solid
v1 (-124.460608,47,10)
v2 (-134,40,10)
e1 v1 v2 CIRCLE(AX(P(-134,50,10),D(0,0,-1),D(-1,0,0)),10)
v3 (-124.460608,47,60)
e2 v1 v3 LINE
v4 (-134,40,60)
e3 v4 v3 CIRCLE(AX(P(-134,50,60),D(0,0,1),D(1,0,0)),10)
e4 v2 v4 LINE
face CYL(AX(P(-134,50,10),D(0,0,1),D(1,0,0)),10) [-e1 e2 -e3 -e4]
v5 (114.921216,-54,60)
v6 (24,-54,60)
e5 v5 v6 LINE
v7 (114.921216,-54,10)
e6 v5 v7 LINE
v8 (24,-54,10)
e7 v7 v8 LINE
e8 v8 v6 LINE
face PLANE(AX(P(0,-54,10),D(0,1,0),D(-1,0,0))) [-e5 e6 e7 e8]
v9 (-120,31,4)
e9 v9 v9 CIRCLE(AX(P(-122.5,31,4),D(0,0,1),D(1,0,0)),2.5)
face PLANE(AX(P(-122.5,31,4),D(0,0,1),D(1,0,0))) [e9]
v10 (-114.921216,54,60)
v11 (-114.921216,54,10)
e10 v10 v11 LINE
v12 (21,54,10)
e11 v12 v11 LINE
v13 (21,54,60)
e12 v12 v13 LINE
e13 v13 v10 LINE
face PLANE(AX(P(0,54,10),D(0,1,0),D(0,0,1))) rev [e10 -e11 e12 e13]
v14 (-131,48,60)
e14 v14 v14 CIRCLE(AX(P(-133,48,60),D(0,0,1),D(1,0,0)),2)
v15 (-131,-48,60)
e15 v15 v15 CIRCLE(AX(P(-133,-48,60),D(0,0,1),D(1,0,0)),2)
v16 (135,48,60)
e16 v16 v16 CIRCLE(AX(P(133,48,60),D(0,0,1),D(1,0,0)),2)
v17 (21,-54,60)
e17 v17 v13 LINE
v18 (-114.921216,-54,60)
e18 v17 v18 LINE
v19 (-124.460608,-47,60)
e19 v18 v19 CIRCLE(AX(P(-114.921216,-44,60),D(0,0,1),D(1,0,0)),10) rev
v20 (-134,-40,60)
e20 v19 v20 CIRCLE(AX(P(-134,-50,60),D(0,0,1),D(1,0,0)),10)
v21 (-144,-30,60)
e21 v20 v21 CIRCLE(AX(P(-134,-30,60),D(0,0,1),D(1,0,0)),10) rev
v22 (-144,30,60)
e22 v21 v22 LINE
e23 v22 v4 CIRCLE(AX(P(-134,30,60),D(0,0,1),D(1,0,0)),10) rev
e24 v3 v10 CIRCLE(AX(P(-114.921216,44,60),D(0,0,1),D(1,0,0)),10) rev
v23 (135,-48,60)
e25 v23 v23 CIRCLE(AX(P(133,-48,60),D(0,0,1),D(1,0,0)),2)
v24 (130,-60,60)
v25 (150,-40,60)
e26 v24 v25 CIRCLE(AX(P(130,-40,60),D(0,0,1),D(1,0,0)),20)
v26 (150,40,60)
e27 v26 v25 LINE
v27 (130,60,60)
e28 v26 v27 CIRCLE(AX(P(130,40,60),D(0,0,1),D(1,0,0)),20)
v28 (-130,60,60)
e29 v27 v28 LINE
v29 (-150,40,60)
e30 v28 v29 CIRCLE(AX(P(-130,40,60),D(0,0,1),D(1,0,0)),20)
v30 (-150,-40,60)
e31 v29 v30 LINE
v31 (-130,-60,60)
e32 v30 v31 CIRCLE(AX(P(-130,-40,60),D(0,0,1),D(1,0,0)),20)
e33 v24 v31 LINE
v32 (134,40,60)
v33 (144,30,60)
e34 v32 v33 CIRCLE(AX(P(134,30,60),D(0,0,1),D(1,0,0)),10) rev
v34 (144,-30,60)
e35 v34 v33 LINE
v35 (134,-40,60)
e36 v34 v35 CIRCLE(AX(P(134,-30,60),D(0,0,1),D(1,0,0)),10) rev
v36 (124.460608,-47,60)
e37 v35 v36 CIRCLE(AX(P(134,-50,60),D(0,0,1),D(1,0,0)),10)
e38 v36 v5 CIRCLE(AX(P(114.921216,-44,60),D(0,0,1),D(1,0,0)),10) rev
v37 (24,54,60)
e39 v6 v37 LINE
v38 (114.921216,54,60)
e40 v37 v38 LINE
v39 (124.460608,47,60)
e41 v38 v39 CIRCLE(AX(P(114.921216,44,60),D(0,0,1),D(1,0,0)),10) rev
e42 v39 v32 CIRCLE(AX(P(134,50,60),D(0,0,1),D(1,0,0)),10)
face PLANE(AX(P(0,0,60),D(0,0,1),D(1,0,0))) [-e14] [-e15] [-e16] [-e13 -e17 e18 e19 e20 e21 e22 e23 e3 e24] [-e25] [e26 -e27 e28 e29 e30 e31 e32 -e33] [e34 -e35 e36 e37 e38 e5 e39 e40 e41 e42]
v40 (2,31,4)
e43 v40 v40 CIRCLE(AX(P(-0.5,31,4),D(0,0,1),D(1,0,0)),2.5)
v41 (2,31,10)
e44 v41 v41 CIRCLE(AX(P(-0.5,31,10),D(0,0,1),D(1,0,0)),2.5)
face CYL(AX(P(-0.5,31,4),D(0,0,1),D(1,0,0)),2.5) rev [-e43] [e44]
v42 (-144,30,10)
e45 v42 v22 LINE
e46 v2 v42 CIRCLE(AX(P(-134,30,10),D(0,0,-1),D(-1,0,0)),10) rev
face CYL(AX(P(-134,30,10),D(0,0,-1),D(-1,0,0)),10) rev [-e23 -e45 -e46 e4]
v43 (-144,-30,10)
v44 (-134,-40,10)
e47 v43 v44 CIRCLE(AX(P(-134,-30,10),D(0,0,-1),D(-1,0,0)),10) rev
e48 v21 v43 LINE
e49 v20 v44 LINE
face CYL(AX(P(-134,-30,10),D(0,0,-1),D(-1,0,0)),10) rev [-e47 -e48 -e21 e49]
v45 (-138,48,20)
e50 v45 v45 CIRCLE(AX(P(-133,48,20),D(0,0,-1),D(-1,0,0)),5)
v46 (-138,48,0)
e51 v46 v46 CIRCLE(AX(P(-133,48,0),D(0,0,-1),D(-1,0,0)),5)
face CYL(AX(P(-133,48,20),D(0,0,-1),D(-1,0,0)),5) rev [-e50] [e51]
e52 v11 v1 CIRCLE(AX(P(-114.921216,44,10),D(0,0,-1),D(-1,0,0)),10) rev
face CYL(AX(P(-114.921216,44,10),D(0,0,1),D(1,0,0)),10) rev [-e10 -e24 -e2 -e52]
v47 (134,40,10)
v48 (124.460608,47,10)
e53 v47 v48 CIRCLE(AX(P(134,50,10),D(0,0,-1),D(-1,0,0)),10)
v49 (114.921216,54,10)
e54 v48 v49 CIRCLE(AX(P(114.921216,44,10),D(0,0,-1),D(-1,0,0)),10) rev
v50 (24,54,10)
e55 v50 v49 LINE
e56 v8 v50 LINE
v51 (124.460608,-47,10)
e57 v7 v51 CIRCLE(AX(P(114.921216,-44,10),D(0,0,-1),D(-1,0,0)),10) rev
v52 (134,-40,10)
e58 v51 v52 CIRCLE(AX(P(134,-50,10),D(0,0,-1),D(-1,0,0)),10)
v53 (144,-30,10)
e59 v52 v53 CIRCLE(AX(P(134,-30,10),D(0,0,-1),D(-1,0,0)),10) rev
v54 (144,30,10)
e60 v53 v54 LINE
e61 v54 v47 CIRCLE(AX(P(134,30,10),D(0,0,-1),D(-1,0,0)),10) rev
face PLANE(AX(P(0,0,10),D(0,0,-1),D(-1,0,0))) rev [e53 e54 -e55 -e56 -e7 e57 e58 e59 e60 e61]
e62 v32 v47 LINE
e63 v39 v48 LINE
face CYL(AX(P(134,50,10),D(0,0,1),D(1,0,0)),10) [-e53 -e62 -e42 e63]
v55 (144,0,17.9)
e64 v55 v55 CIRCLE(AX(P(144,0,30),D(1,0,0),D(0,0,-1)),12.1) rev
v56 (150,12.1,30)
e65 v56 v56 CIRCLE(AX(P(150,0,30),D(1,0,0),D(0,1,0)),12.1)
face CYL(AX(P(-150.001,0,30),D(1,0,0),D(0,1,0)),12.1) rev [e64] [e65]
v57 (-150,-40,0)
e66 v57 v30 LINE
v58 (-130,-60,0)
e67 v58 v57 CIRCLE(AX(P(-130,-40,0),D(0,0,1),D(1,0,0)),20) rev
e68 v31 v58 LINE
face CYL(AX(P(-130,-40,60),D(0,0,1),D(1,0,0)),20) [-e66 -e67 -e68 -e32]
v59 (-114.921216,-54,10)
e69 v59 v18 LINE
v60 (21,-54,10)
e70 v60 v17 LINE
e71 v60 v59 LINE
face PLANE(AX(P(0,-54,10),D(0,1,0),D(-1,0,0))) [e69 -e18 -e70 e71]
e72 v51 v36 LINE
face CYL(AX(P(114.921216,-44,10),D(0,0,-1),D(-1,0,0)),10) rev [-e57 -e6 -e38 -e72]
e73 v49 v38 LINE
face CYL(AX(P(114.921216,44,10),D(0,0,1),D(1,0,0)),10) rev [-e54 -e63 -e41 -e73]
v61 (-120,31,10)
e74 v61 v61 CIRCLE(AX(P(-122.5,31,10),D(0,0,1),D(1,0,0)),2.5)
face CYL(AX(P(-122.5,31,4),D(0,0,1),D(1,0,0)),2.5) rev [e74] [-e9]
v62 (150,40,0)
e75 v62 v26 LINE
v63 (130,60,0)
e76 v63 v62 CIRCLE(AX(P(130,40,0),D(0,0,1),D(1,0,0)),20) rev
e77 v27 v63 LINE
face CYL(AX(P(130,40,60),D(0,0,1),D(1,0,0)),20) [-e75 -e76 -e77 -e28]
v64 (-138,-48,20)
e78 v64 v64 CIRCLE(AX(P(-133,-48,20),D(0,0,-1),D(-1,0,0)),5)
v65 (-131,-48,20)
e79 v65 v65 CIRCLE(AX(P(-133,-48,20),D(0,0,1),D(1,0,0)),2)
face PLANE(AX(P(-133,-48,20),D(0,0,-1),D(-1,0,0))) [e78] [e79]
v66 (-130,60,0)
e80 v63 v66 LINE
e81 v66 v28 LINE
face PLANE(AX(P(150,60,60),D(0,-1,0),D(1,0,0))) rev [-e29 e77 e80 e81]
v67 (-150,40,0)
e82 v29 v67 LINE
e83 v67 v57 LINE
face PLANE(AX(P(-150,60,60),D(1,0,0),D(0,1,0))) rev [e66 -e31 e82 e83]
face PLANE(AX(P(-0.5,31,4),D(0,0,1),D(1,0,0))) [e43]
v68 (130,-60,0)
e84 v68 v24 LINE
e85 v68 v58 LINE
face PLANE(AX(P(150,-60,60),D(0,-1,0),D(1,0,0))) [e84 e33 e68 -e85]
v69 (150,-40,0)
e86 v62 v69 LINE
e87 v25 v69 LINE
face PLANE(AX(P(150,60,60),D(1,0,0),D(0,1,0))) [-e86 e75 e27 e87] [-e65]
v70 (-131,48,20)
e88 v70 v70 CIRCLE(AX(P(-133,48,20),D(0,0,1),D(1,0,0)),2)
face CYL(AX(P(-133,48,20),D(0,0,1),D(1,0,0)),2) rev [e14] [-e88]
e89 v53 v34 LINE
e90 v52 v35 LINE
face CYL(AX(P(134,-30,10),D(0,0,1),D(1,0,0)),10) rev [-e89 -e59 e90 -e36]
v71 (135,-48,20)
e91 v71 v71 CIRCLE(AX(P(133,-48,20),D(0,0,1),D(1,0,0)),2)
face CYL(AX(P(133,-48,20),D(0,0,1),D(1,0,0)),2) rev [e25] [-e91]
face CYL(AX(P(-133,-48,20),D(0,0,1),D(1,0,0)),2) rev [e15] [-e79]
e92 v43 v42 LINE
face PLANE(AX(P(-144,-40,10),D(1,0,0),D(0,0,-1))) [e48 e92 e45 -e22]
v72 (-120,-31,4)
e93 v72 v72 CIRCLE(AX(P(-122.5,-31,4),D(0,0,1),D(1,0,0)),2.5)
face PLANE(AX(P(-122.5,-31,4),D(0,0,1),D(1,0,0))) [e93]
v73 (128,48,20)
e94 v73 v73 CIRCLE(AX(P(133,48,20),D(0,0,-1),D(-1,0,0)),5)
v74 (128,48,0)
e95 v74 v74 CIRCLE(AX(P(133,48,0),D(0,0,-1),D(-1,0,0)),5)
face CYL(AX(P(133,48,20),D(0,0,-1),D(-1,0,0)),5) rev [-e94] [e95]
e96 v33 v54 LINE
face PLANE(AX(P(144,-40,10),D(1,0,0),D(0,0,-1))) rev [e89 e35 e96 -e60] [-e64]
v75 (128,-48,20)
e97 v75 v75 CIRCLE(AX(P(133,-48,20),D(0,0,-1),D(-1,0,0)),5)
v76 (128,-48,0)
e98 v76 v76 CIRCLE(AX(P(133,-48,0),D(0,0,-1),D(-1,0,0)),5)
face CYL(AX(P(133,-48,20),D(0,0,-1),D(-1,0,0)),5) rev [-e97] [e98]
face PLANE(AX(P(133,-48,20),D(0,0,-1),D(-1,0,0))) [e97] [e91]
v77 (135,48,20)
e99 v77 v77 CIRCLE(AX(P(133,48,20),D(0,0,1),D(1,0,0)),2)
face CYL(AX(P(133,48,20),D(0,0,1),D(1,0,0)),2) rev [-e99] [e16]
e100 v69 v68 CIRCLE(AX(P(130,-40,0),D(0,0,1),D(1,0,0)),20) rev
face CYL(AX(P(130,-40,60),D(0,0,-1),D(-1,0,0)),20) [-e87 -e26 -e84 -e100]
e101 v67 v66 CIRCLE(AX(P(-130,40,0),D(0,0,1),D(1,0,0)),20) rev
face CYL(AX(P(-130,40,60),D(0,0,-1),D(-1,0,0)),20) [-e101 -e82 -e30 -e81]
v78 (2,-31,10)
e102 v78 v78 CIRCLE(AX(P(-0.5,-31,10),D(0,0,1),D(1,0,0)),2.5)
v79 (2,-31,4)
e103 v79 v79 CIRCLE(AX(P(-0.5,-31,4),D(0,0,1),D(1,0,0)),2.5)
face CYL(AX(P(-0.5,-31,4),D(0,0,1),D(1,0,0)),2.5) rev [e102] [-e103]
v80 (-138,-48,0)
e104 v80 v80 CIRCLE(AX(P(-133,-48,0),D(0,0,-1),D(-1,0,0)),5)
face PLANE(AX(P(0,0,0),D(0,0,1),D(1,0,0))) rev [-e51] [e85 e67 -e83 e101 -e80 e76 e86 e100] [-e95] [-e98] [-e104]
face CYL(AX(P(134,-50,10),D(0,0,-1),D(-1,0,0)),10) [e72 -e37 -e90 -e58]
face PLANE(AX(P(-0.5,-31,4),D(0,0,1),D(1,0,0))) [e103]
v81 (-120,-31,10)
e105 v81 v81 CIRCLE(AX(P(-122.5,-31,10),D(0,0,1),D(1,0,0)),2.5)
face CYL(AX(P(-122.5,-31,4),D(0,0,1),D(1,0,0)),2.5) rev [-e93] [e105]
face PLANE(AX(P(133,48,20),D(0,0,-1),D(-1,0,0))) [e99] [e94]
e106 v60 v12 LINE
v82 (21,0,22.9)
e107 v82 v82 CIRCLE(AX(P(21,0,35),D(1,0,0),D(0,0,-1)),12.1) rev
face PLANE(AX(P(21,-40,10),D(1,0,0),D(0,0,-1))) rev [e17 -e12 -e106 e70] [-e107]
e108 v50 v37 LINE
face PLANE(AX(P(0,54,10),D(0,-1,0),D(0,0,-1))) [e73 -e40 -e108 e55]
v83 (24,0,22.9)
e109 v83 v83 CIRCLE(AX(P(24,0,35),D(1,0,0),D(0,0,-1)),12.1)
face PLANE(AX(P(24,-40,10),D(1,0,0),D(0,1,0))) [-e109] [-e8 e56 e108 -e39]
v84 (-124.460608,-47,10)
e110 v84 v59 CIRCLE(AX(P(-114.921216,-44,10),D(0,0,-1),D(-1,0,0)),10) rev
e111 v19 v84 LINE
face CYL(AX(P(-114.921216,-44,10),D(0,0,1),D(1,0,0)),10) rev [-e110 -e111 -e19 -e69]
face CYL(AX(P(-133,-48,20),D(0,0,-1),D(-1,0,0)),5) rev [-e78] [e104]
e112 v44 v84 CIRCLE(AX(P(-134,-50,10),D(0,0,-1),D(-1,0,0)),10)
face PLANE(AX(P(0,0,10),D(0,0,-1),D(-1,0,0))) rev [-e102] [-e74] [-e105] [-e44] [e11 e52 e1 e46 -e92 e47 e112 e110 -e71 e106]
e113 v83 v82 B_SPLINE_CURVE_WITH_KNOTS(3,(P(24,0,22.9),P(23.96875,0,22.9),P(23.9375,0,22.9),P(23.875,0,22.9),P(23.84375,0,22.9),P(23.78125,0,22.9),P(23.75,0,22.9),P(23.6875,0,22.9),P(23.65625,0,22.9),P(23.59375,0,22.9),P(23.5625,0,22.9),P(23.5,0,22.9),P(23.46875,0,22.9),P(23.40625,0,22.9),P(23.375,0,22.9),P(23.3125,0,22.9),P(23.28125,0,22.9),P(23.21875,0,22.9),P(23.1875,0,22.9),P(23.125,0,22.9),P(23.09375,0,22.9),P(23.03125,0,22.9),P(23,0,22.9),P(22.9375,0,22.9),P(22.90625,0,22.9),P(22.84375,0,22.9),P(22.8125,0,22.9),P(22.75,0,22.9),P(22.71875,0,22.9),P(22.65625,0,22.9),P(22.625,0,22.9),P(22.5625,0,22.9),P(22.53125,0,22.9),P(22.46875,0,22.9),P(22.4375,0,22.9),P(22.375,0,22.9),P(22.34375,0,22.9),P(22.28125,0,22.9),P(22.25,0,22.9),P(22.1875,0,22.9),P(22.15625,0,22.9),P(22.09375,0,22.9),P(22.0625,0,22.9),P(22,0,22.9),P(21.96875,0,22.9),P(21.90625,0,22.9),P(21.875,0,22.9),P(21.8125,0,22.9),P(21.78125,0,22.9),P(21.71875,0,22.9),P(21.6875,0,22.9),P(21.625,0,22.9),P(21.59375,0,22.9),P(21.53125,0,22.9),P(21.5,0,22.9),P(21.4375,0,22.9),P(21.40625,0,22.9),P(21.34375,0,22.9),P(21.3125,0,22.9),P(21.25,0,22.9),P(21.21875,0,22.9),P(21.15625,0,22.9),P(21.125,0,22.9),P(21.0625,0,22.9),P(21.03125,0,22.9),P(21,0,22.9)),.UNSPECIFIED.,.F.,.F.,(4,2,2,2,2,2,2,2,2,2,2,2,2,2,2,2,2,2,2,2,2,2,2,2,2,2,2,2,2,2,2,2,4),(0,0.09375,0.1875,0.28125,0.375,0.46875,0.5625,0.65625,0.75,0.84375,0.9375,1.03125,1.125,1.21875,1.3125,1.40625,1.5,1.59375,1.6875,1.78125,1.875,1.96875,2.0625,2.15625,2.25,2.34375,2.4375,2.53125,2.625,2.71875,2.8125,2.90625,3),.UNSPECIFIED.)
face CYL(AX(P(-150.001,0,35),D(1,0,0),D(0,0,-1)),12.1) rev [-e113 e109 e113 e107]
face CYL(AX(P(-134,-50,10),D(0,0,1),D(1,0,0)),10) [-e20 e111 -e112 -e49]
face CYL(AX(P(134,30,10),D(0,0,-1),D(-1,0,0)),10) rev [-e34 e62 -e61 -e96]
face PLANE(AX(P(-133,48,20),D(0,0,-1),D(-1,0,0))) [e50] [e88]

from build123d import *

# Parameters (mm, degrees)
SKETCH_1_W           = 300
SKETCH_1_H           = 120
EXTRUDE_2_DEPTH      = 60
SKETCH_2_W           = 120
SKETCH_2_H           = 80
SKETCH_2_W_2         = 165
CUT_EXTRUDE_1_DEPTH  = 50
FILLET_5_R           = 20
SKETCH_2_5_R         = 2
CUT_EXTRUDE_5_DEPTH  = 40
CUT_EXTRUDE_4_REACH  = 313.769
SKETCH_10_R          = 12.1
SKETCH_13_R          = 5
CUT_EXTRUDE_7_DEPTH  = 20
CUT_EXTRUDE_8_REACH  = 195.587
SKETCH_16_R          = 2.5
CUT_EXTRUDE_9_DEPTH  = 6
SKETCH_2_7_W         = 100
SKETCH_2_7_H         = 14
SKETCH_2_7_W_2       = 145
CUT_EXTRUDE_10_DEPTH = 50
FILLET_6_R           = 10
FILLET_7_R           = 10
FILLET_8_R           = 10
FILLET_9_R           = 10
FILLET_10_R          = 10
FILLET_11_R          = 10
FILLET_12_R          = 10
FILLET_14_R          = 10
FILLET_15_R          = 10
FILLET_16_R          = 10


with BuildPart() as part:
    # Эскиз1 → Бобышка-Вытянуть2 (new body)
    with BuildSketch(Plane.XY):
        Rectangle(SKETCH_1_W, SKETCH_1_H)
    extrude(amount=EXTRUDE_2_DEPTH)

    # Эскиз2 → Вырез-Вытянуть1 (cut)
    with BuildSketch(Plane.XY.offset(60)):
        with Locations((84, 0)):
            Rectangle(SKETCH_2_W, SKETCH_2_H)
        with Locations((-61.5, 0)):
            Rectangle(SKETCH_2_W_2, SKETCH_2_H)
    extrude(amount=-CUT_EXTRUDE_1_DEPTH, mode=Mode.SUBTRACT)

    # Скругление5
    fillet_5_edges = [part.edges().sort_by_distance(p)[0] for p in [
        (150, -60, 30),
        (150, 60, 30),
        (-150, 60, 30),
        (-150, -60, 30),
    ]]
    fillet(fillet_5_edges, radius=FILLET_5_R)

    # Эскиз2<5> → Вырез-Вытянуть5 (cut)
    with BuildSketch(Plane.XY.offset(60)):
        with Locations((133, 48)):
            Circle(SKETCH_2_5_R)
        with Locations((133, -48)):
            Circle(SKETCH_2_5_R)
        with Locations((-133, 48)):
            Circle(SKETCH_2_5_R)
        with Locations((-133, -48)):
            Circle(SKETCH_2_5_R)
    extrude(amount=-CUT_EXTRUDE_5_DEPTH, mode=Mode.SUBTRACT)

    # Эскиз10 → Вырез-Вытянуть4 (cut, up to next)
    with BuildSketch(Plane(origin=(150, 0, 0), x_dir=(0, 0, -1), z_dir=(1, 0, 0)), mode=Mode.PRIVATE) as cut_extrude_4_sk1:
        with Locations(Location((-30, 0, 0), (0, 0, 90))):
            Circle(SKETCH_10_R)
    cut_extrude_4_tool1 = extrude(cut_extrude_4_sk1.sketch, amount=-CUT_EXTRUDE_4_REACH, mode=Mode.PRIVATE) & part.part
    add(cut_extrude_4_tool1.solids().sort_by_distance((150, 0, 30))[0], mode=Mode.SUBTRACT)

    # Эскиз13 → Вырез-Вытянуть7 (cut)
    with BuildSketch(Plane(origin=(0, 0, 0), x_dir=(-1, 0, 0), z_dir=(0, 0, -1))):
        with Locations((-133, 48)):
            Circle(SKETCH_13_R)
        with Locations((-133, -48)):
            Circle(SKETCH_13_R)
        with Locations((133, -48)):
            Circle(SKETCH_13_R)
        with Locations((133, 48)):
            Circle(SKETCH_13_R)
    extrude(amount=-CUT_EXTRUDE_7_DEPTH, mode=Mode.SUBTRACT)

    # Эскиз14 → Вырез-Вытянуть8 (cut, up to next)
    with BuildSketch(Plane(origin=(24, 0, 0), x_dir=(0, 0, -1), z_dir=(1, 0, 0)), mode=Mode.PRIVATE) as cut_extrude_8_sk1:
        with BuildLine():
            ThreePointArc((-28.587012826, 10.260779478), (-35, 12.1), (-41.412987174, 10.260779478))
            Line((-41.412987174, 10.260779478), (-35, 0))
            Line((-35, 0), (-28.587012826, 10.260779478))
        make_face()
    cut_extrude_8_tool1 = extrude(cut_extrude_8_sk1.sketch, amount=-CUT_EXTRUDE_8_REACH, mode=Mode.PRIVATE) & part.part
    # Эскиз14 → Вырез-Вытянуть8 (cut, up to next)
    with BuildSketch(Plane(origin=(24, 0, 0), x_dir=(0, 0, -1), z_dir=(1, 0, 0)), mode=Mode.PRIVATE) as cut_extrude_8_sk2:
        with BuildLine():
            Line((-35, 0), (-41.412987174, 10.260779478))
            ThreePointArc((-41.412987174, 10.260779478), (-47.1, 0), (-41.412987174, -10.260779478))
            Line((-41.412987174, -10.260779478), (-35, 0))
        make_face()
    cut_extrude_8_tool2 = extrude(cut_extrude_8_sk2.sketch, amount=-CUT_EXTRUDE_8_REACH, mode=Mode.PRIVATE) & part.part
    # Эскиз14 → Вырез-Вытянуть8 (cut, up to next)
    with BuildSketch(Plane(origin=(24, 0, 0), x_dir=(0, 0, -1), z_dir=(1, 0, 0)), mode=Mode.PRIVATE) as cut_extrude_8_sk3:
        with BuildLine():
            Line((-28.587012826, 10.260779478), (-35, 0))
            Line((-35, 0), (-28.587012826, -10.260779478))
            ThreePointArc((-28.587012826, -10.260779478), (-24.416825977, -5.865699242), (-22.9, 0))
            ThreePointArc((-22.9, 0), (-24.416825977, 5.865699242), (-28.587012826, 10.260779478))
        make_face()
    cut_extrude_8_tool3 = extrude(cut_extrude_8_sk3.sketch, amount=-CUT_EXTRUDE_8_REACH, mode=Mode.PRIVATE) & part.part
    # Эскиз14 → Вырез-Вытянуть8 (cut, up to next)
    with BuildSketch(Plane(origin=(24, 0, 0), x_dir=(0, 0, -1), z_dir=(1, 0, 0)), mode=Mode.PRIVATE) as cut_extrude_8_sk4:
        with BuildLine():
            Line((-28.587012826, -10.260779478), (-35, 0))
            Line((-35, 0), (-41.412987174, -10.260779478))
            ThreePointArc((-41.412987174, -10.260779478), (-35, -12.1), (-28.587012826, -10.260779478))
        make_face()
    cut_extrude_8_tool4 = extrude(cut_extrude_8_sk4.sketch, amount=-CUT_EXTRUDE_8_REACH, mode=Mode.PRIVATE) & part.part
    # Эскиз14 → Вырез-Вытянуть8 (cut, up to next)
    with BuildSketch(Plane(origin=(24, 0, 0), x_dir=(0, 0, -1), z_dir=(1, 0, 0)), mode=Mode.PRIVATE) as cut_extrude_8_sk5:
        with BuildLine():
            ThreePointArc((-28.587012826, 10.260779478), (-35, 12.1), (-41.412987174, 10.260779478))
            Line((-41.412987174, 10.260779478), (-35, 0))
            Line((-35, 0), (-28.587012826, 10.260779478))
        make_face()
    cut_extrude_8_tool5 = extrude(cut_extrude_8_sk5.sketch, amount=-CUT_EXTRUDE_8_REACH, mode=Mode.PRIVATE) & part.part
    # Эскиз14 → Вырез-Вытянуть8 (cut, up to next)
    with BuildSketch(Plane(origin=(24, 0, 0), x_dir=(0, 0, -1), z_dir=(1, 0, 0)), mode=Mode.PRIVATE) as cut_extrude_8_sk6:
        with BuildLine():
            Line((-35, 0), (-41.412987174, 10.260779478))
            ThreePointArc((-41.412987174, 10.260779478), (-47.1, 0), (-41.412987174, -10.260779478))
            Line((-41.412987174, -10.260779478), (-35, 0))
        make_face()
    cut_extrude_8_tool6 = extrude(cut_extrude_8_sk6.sketch, amount=-CUT_EXTRUDE_8_REACH, mode=Mode.PRIVATE) & part.part
    # Эскиз14 → Вырез-Вытянуть8 (cut, up to next)
    with BuildSketch(Plane(origin=(24, 0, 0), x_dir=(0, 0, -1), z_dir=(1, 0, 0)), mode=Mode.PRIVATE) as cut_extrude_8_sk7:
        with BuildLine():
            Line((-28.587012826, 10.260779478), (-35, 0))
            Line((-35, 0), (-28.587012826, -10.260779478))
            ThreePointArc((-28.587012826, -10.260779478), (-24.416825977, -5.865699242), (-22.9, 0))
            ThreePointArc((-22.9, 0), (-24.416825977, 5.865699242), (-28.587012826, 10.260779478))
        make_face()
    cut_extrude_8_tool7 = extrude(cut_extrude_8_sk7.sketch, amount=-CUT_EXTRUDE_8_REACH, mode=Mode.PRIVATE) & part.part
    # Эскиз14 → Вырез-Вытянуть8 (cut, up to next)
    with BuildSketch(Plane(origin=(24, 0, 0), x_dir=(0, 0, -1), z_dir=(1, 0, 0)), mode=Mode.PRIVATE) as cut_extrude_8_sk8:
        with BuildLine():
            Line((-28.587012826, -10.260779478), (-35, 0))
            Line((-35, 0), (-41.412987174, -10.260779478))
            ThreePointArc((-41.412987174, -10.260779478), (-35, -12.1), (-28.587012826, -10.260779478))
        make_face()
    cut_extrude_8_tool8 = extrude(cut_extrude_8_sk8.sketch, amount=-CUT_EXTRUDE_8_REACH, mode=Mode.PRIVATE) & part.part
    # Эскиз14 → Вырез-Вытянуть8 (cut, up to next)
    with BuildSketch(Plane(origin=(24, 0, 0), x_dir=(0, 0, -1), z_dir=(1, 0, 0)), mode=Mode.PRIVATE) as cut_extrude_8_sk9:
        with BuildLine():
            ThreePointArc((-28.587012826, 10.260779478), (-35, 12.1), (-41.412987174, 10.260779478))
            Line((-41.412987174, 10.260779478), (-35, 0))
            Line((-35, 0), (-28.587012826, 10.260779478))
        make_face()
    cut_extrude_8_tool9 = extrude(cut_extrude_8_sk9.sketch, amount=-CUT_EXTRUDE_8_REACH, mode=Mode.PRIVATE) & part.part
    # Эскиз14 → Вырез-Вытянуть8 (cut, up to next)
    with BuildSketch(Plane(origin=(24, 0, 0), x_dir=(0, 0, -1), z_dir=(1, 0, 0)), mode=Mode.PRIVATE) as cut_extrude_8_sk10:
        with BuildLine():
            Line((-35, 0), (-41.412987174, 10.260779478))
            ThreePointArc((-41.412987174, 10.260779478), (-47.1, 0), (-41.412987174, -10.260779478))
            Line((-41.412987174, -10.260779478), (-35, 0))
        make_face()
    cut_extrude_8_tool10 = extrude(cut_extrude_8_sk10.sketch, amount=-CUT_EXTRUDE_8_REACH, mode=Mode.PRIVATE) & part.part
    # Эскиз14 → Вырез-Вытянуть8 (cut, up to next)
    with BuildSketch(Plane(origin=(24, 0, 0), x_dir=(0, 0, -1), z_dir=(1, 0, 0)), mode=Mode.PRIVATE) as cut_extrude_8_sk11:
        with BuildLine():
            Line((-28.587012826, 10.260779478), (-35, 0))
            Line((-35, 0), (-28.587012826, -10.260779478))
            ThreePointArc((-28.587012826, -10.260779478), (-24.416825977, -5.865699242), (-22.9, 0))
            ThreePointArc((-22.9, 0), (-24.416825977, 5.865699242), (-28.587012826, 10.260779478))
        make_face()
    cut_extrude_8_tool11 = extrude(cut_extrude_8_sk11.sketch, amount=-CUT_EXTRUDE_8_REACH, mode=Mode.PRIVATE) & part.part
    # Эскиз14 → Вырез-Вытянуть8 (cut, up to next)
    with BuildSketch(Plane(origin=(24, 0, 0), x_dir=(0, 0, -1), z_dir=(1, 0, 0)), mode=Mode.PRIVATE) as cut_extrude_8_sk12:
        with BuildLine():
            Line((-28.587012826, -10.260779478), (-35, 0))
            Line((-35, 0), (-41.412987174, -10.260779478))
            ThreePointArc((-41.412987174, -10.260779478), (-35, -12.1), (-28.587012826, -10.260779478))
        make_face()
    cut_extrude_8_tool12 = extrude(cut_extrude_8_sk12.sketch, amount=-CUT_EXTRUDE_8_REACH, mode=Mode.PRIVATE) & part.part
    # Эскиз14 → Вырез-Вытянуть8 (cut, up to next)
    with BuildSketch(Plane(origin=(24, 0, 0), x_dir=(0, 0, -1), z_dir=(1, 0, 0)), mode=Mode.PRIVATE) as cut_extrude_8_sk13:
        with BuildLine():
            ThreePointArc((-28.587012826, 10.260779478), (-35, 12.1), (-41.412987174, 10.260779478))
            Line((-41.412987174, 10.260779478), (-35, 0))
            Line((-35, 0), (-28.587012826, 10.260779478))
        make_face()
    cut_extrude_8_tool13 = extrude(cut_extrude_8_sk13.sketch, amount=-CUT_EXTRUDE_8_REACH, mode=Mode.PRIVATE) & part.part
    # Эскиз14 → Вырез-Вытянуть8 (cut, up to next)
    with BuildSketch(Plane(origin=(24, 0, 0), x_dir=(0, 0, -1), z_dir=(1, 0, 0)), mode=Mode.PRIVATE) as cut_extrude_8_sk14:
        with BuildLine():
            Line((-35, 0), (-41.412987174, 10.260779478))
            ThreePointArc((-41.412987174, 10.260779478), (-47.1, 0), (-41.412987174, -10.260779478))
            Line((-41.412987174, -10.260779478), (-35, 0))
        make_face()
    cut_extrude_8_tool14 = extrude(cut_extrude_8_sk14.sketch, amount=-CUT_EXTRUDE_8_REACH, mode=Mode.PRIVATE) & part.part
    # Эскиз14 → Вырез-Вытянуть8 (cut, up to next)
    with BuildSketch(Plane(origin=(24, 0, 0), x_dir=(0, 0, -1), z_dir=(1, 0, 0)), mode=Mode.PRIVATE) as cut_extrude_8_sk15:
        with BuildLine():
            Line((-28.587012826, 10.260779478), (-35, 0))
            Line((-35, 0), (-28.587012826, -10.260779478))
            ThreePointArc((-28.587012826, -10.260779478), (-24.416825977, -5.865699242), (-22.9, 0))
            ThreePointArc((-22.9, 0), (-24.416825977, 5.865699242), (-28.587012826, 10.260779478))
        make_face()
    cut_extrude_8_tool15 = extrude(cut_extrude_8_sk15.sketch, amount=-CUT_EXTRUDE_8_REACH, mode=Mode.PRIVATE) & part.part
    # Эскиз14 → Вырез-Вытянуть8 (cut, up to next)
    with BuildSketch(Plane(origin=(24, 0, 0), x_dir=(0, 0, -1), z_dir=(1, 0, 0)), mode=Mode.PRIVATE) as cut_extrude_8_sk16:
        with BuildLine():
            Line((-28.587012826, -10.260779478), (-35, 0))
            Line((-35, 0), (-41.412987174, -10.260779478))
            ThreePointArc((-41.412987174, -10.260779478), (-35, -12.1), (-28.587012826, -10.260779478))
        make_face()
    cut_extrude_8_tool16 = extrude(cut_extrude_8_sk16.sketch, amount=-CUT_EXTRUDE_8_REACH, mode=Mode.PRIVATE) & part.part
    add(cut_extrude_8_tool1.solids().sort_by_distance((24, 7.653652, 35))[0], mode=Mode.SUBTRACT)
    add(cut_extrude_8_tool2.solids().sort_by_distance((24, 0, 41.758091))[0], mode=Mode.SUBTRACT)
    add(cut_extrude_8_tool3.solids().sort_by_distance((24, 0, 28.241909))[0], mode=Mode.SUBTRACT)
    add(cut_extrude_8_tool4.solids().sort_by_distance((24, -7.653652, 35))[0], mode=Mode.SUBTRACT)
    add(cut_extrude_8_tool5.solids().sort_by_distance((24, 7.653652, 35))[0], mode=Mode.SUBTRACT)
    add(cut_extrude_8_tool6.solids().sort_by_distance((24, 0, 41.758091))[0], mode=Mode.SUBTRACT)
    add(cut_extrude_8_tool7.solids().sort_by_distance((24, 0, 28.241909))[0], mode=Mode.SUBTRACT)
    add(cut_extrude_8_tool8.solids().sort_by_distance((24, -7.653652, 35))[0], mode=Mode.SUBTRACT)
    add(cut_extrude_8_tool9.solids().sort_by_distance((24, 7.653652, 35))[0], mode=Mode.SUBTRACT)
    add(cut_extrude_8_tool10.solids().sort_by_distance((24, 0, 41.758091))[0], mode=Mode.SUBTRACT)
    add(cut_extrude_8_tool11.solids().sort_by_distance((24, 0, 28.241909))[0], mode=Mode.SUBTRACT)
    add(cut_extrude_8_tool12.solids().sort_by_distance((24, -7.653652, 35))[0], mode=Mode.SUBTRACT)
    add(cut_extrude_8_tool13.solids().sort_by_distance((24, 7.653652, 35))[0], mode=Mode.SUBTRACT)
    add(cut_extrude_8_tool14.solids().sort_by_distance((24, 0, 41.758091))[0], mode=Mode.SUBTRACT)
    add(cut_extrude_8_tool15.solids().sort_by_distance((24, 0, 28.241909))[0], mode=Mode.SUBTRACT)
    add(cut_extrude_8_tool16.solids().sort_by_distance((24, -7.653652, 35))[0], mode=Mode.SUBTRACT)

    # Эскиз16 → Вырез-Вытянуть9 (cut)
    with BuildSketch(Plane.XY.offset(10)):
        with Locations((-0.5, -31)):
            Circle(SKETCH_16_R)
        with Locations((-122.5, -31)):
            Circle(SKETCH_16_R)
        with Locations((-0.5, 31)):
            Circle(SKETCH_16_R)
        with Locations((-122.5, 31)):
            Circle(SKETCH_16_R)
    extrude(amount=-CUT_EXTRUDE_9_DEPTH, mode=Mode.SUBTRACT)

    # Эскиз2<7> → Вырез-Вытянуть10 (cut)
    with BuildSketch(Plane.XY.offset(60)):
        with Locations((74, -47)):
            Rectangle(SKETCH_2_7_W, SKETCH_2_7_H)
        with Locations((-51.5, -47)):
            Rectangle(SKETCH_2_7_W_2, SKETCH_2_7_H)
        with Locations((-51.5, 47)):
            Rectangle(SKETCH_2_7_W_2, SKETCH_2_7_H)
        with Locations((74, 47)):
            Rectangle(SKETCH_2_7_W, SKETCH_2_7_H)
    extrude(amount=-CUT_EXTRUDE_10_DEPTH, mode=Mode.SUBTRACT)

    # Скругление6
    fillet_6_edges = [part.edges().sort_by_distance(p)[0] for p in [
        (-124, -40, 35),
    ]]
    fillet(fillet_6_edges, radius=FILLET_6_R)

    # Скругление7
    fillet_7_edges = [part.edges().sort_by_distance(p)[0] for p in [
        (-144, -40, 35),
    ]]
    fillet(fillet_7_edges, radius=FILLET_7_R - 0.0001)  # a hair under: the kernel refuses the full size

    # Скругление8
    fillet_8_edges = [part.edges().sort_by_distance(p)[0] for p in [
        (124, -40, 35),
    ]]
    fillet(fillet_8_edges, radius=FILLET_8_R)

    # Скругление9
    fillet_9_edges = [part.edges().sort_by_distance(p)[0] for p in [
        (144, -40, 35),
    ]]
    fillet(fillet_9_edges, radius=FILLET_9_R - 0.0001)  # a hair under: the kernel refuses the full size

    # Скругление10
    fillet_10_edges = [part.edges().sort_by_distance(p)[0] for p in [
        (124, 40, 35),
    ]]
    fillet(fillet_10_edges, radius=FILLET_10_R)

    # Скругление11
    fillet_11_edges = [part.edges().sort_by_distance(p)[0] for p in [
        (124, -54, 35),
    ]]
    fillet(fillet_11_edges, radius=FILLET_11_R)

    # Скругление12
    fillet_12_edges = [part.edges().sort_by_distance(p)[0] for p in [
        (-124, -54, 35),
    ]]
    fillet(fillet_12_edges, radius=FILLET_12_R)

    # Скругление14
    fillet_14_edges = [part.edges().sort_by_distance(p)[0] for p in [
        (-144, 40, 35),
    ]]
    fillet(fillet_14_edges, radius=FILLET_14_R)
    fillet_14_2_edges = [part.edges().sort_by_distance(p)[0] for p in [
        (-124, 40, 35),
    ]]
    fillet(fillet_14_2_edges, radius=FILLET_14_R - 0.0001)  # a hair under: the kernel refuses the full size

    # Скругление15
    fillet_15_edges = [part.edges().sort_by_distance(p)[0] for p in [
        (-124, 54, 35),
    ]]
    fillet(fillet_15_edges, radius=FILLET_15_R)

    # Скругление16
    fillet_16_edges = [part.edges().sort_by_distance(p)[0] for p in [
        (124, 54, 35),
        (144, 40, 35),
    ]]
    fillet(fillet_16_edges, radius=FILLET_16_R - 0.0001)  # a hair under: the kernel refuses the full size


solid = part.part
